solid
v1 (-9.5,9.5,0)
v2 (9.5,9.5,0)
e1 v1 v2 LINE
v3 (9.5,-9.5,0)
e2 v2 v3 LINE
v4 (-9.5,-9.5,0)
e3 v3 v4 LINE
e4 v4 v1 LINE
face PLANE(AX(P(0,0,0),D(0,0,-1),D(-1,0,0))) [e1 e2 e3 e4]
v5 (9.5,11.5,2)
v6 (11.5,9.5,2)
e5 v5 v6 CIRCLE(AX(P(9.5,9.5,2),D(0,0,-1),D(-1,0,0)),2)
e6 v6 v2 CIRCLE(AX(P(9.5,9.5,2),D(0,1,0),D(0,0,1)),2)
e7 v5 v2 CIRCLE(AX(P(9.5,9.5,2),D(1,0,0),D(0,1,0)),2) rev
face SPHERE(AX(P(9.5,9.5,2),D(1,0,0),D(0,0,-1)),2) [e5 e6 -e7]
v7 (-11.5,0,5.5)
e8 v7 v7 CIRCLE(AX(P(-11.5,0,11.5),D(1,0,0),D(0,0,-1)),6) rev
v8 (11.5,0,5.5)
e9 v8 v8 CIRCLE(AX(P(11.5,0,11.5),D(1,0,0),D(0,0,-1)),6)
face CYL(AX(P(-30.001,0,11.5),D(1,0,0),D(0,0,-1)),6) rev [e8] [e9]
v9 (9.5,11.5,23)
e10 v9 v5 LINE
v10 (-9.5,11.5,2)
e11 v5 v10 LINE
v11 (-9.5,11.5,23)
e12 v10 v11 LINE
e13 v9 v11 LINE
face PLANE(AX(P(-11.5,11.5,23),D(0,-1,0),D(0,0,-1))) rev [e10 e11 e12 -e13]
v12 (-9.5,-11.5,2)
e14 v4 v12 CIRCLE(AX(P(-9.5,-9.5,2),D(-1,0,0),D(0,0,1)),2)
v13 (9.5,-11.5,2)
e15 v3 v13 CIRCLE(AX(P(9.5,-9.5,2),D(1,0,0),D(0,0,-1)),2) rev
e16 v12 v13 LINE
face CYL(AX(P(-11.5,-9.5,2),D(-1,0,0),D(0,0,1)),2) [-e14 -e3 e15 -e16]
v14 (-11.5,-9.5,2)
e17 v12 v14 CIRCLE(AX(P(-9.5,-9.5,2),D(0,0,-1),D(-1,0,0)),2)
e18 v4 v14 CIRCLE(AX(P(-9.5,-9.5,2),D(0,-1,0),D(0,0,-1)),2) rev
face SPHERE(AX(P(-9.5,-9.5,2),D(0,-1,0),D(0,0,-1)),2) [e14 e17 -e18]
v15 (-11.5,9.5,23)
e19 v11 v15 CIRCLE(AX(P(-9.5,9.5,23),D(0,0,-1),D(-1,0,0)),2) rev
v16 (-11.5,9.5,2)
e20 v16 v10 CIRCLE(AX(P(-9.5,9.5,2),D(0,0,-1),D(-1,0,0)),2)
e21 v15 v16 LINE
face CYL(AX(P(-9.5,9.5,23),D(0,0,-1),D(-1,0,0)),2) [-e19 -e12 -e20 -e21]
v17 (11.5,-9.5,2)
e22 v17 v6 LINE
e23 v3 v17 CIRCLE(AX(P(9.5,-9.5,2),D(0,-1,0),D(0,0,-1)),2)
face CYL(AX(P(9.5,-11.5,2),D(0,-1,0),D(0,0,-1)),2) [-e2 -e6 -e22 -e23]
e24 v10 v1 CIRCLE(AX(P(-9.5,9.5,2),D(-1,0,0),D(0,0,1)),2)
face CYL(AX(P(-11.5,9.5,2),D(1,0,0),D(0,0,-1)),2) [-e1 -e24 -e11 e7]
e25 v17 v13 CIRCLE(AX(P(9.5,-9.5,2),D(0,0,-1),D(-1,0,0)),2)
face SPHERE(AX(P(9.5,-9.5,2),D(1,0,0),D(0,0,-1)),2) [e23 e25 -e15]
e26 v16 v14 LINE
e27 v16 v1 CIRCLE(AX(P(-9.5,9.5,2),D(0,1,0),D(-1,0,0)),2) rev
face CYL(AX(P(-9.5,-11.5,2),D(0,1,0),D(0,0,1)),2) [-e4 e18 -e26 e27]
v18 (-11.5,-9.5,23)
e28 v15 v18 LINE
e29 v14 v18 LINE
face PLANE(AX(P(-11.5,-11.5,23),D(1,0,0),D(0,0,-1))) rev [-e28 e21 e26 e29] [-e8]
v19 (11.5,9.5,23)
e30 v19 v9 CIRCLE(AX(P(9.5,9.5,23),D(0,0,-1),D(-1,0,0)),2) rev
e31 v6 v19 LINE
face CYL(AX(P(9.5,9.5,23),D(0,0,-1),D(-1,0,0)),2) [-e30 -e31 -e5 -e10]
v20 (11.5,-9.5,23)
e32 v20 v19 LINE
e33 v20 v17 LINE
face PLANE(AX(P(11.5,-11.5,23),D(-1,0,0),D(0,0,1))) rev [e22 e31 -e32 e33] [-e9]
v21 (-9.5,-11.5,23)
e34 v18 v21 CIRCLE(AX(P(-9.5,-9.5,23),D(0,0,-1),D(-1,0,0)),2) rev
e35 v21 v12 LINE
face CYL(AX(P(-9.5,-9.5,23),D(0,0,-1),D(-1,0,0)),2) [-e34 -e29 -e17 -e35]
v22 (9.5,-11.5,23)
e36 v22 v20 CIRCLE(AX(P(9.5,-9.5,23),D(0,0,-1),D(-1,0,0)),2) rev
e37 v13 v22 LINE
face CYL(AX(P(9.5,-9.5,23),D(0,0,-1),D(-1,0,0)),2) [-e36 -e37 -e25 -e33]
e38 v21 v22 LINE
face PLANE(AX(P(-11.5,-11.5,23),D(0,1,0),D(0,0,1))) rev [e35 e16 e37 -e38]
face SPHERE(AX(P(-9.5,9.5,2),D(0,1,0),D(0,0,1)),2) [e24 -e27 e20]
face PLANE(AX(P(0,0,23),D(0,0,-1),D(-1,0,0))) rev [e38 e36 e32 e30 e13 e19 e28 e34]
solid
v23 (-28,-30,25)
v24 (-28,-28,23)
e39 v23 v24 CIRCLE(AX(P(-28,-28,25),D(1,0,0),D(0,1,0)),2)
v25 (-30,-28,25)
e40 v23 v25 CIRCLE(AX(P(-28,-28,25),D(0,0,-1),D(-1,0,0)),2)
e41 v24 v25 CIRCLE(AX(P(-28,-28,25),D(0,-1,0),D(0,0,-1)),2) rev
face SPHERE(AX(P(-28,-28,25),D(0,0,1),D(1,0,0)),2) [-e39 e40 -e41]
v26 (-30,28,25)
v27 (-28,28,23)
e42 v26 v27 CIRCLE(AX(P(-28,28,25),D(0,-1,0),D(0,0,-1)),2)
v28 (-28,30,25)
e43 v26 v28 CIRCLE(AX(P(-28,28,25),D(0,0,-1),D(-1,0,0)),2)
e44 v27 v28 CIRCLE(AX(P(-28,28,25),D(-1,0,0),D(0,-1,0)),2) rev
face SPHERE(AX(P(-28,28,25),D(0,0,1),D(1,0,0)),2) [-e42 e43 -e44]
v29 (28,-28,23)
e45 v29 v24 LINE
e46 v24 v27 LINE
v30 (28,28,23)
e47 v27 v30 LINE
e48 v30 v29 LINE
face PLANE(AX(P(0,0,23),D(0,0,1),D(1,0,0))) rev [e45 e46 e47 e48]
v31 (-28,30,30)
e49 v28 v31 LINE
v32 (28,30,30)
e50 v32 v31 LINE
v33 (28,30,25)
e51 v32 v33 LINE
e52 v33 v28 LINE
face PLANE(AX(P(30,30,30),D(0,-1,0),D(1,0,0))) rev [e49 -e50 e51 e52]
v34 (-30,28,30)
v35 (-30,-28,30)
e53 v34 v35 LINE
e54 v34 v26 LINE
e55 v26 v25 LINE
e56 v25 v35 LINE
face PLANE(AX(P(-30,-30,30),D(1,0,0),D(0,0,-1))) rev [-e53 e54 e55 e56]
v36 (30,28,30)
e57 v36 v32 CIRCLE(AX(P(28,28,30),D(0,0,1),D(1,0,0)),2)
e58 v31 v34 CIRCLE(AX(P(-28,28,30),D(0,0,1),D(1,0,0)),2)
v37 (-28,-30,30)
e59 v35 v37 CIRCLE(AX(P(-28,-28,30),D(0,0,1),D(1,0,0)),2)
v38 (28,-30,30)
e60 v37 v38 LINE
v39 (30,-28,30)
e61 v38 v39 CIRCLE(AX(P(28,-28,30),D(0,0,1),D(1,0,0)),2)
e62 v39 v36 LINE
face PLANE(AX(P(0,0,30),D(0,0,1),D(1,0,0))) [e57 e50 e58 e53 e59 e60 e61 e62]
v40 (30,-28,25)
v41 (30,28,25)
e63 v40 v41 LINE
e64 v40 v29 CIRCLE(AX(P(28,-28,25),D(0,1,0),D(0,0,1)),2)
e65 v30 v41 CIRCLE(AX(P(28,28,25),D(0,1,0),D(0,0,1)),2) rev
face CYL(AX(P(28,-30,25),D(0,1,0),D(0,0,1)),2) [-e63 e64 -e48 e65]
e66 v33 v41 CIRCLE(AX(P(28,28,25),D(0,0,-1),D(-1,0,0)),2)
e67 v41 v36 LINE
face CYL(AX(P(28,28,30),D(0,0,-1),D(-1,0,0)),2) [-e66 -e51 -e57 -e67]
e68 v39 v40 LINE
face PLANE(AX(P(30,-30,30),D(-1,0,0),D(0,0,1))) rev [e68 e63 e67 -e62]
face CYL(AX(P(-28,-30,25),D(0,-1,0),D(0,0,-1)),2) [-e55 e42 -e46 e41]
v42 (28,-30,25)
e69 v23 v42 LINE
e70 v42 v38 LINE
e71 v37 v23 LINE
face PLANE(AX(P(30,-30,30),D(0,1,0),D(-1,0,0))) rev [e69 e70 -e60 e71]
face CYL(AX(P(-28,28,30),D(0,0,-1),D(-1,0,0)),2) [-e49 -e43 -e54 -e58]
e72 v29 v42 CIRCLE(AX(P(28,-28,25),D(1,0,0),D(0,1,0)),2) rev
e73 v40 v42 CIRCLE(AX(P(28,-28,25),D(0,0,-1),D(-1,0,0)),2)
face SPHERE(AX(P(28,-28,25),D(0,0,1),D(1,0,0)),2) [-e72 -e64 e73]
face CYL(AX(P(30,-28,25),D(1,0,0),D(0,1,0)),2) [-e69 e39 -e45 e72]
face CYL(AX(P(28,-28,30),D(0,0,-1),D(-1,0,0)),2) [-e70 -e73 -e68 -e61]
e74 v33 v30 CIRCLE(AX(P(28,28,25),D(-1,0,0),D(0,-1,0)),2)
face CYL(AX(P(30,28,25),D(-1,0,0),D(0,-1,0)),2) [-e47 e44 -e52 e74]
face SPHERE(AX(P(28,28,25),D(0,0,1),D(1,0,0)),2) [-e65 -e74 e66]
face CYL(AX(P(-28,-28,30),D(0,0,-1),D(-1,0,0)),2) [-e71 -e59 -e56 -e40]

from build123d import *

# Parameters (mm, degrees)
ESBO_O1_W                = 23
ESBO_O1_H                = 23
RESSALTO_EXTRUS_O1_DEPTH = 23
ESBO_O3_W                = 60
ESBO_O3_H                = 60
RESSALTO_EXTRUS_O2_DEPTH = 7
ESBO_O6_R                = 6
CORTE_EXTRUS_O1_DEPTH    = 23
FILETE1_R                = 2
FILETE2_R                = 2
FILETE3_R                = 2


with BuildPart() as part:
    # Esboço1 → Ressalto-extrusão1 (new body)
    with BuildSketch(Plane.XY):
        Rectangle(ESBO_O1_W, ESBO_O1_H)
    extrude(amount=RESSALTO_EXTRUS_O1_DEPTH)

    # Esboço6 → Corte-extrusão1 (cut)
    with BuildSketch(Plane(origin=(11.5, 0, 0), x_dir=(0, 0, -1), z_dir=(1, 0, 0))):
        with Locations((-11.5, 0)):
            Circle(ESBO_O6_R)
    extrude(amount=-CORTE_EXTRUS_O1_DEPTH, mode=Mode.SUBTRACT)

    # Filete3
    filete3_edges = [part.edges().sort_by_distance(p)[0] for p in [
        (0, -11.5, 0),
        (-11.5, 0, 0),
        (0, 11.5, 0),
        (11.5, 0, 0),
        (11.5, -11.5, 11.5),
        (-11.5, -11.5, 11.5),
        (-11.5, 11.5, 11.5),
        (11.5, 11.5, 11.5),
    ]]
    fillet(filete3_edges, radius=FILETE3_R)


with BuildPart() as body_2:
    # Esboço3 → Ressalto-extrusão2 (new body)
    with BuildSketch(Plane.XY.offset(23)):
        Rectangle(ESBO_O3_W, ESBO_O3_H)
    extrude(amount=RESSALTO_EXTRUS_O2_DEPTH)

    # Filete1
    filete1_edges = [body_2.edges().sort_by_distance(p)[0] for p in [
        (0, 30, 23),
        (30, 0, 23),
        (0, -30, 23),
        (-30, 0, 23),
    ]]
    fillet(filete1_edges, radius=FILETE1_R)

    # Filete2
    # the kernel refuses this fillet: 2 mm, written as the material it takes off along each edge
    with BuildSketch(Plane(origin=(-28, -28, 25), x_dir=(-1, 0, 0), z_dir=(0, -1, 0))) as filete2_piece_1_section:
        Polygon((0, 0), (FILETE2_R, 0), (FILETE2_R, FILETE2_R), (0, FILETE2_R), align=None)
    filete2_piece_1 = extrude(amount=FILETE2_R, mode=Mode.PRIVATE)
    filete2_piece_1 = filete2_piece_1 - Plane(origin=(-28, -28, 25), x_dir=(0.7071067811865475, 0, 0.7071067811865475), z_dir=(0, -1, 0)) * Sphere(FILETE2_R, mode=Mode.PRIVATE)
    add(filete2_piece_1, mode=Mode.SUBTRACT)
    with BuildSketch(Plane(origin=(-28, 28, 25), x_dir=(0, 1, 0), z_dir=(-1, 0, 0))) as filete2_piece_2_section:
        Polygon((0, 0), (FILETE2_R, 0), (FILETE2_R, FILETE2_R), (0, FILETE2_R), align=None)
    filete2_piece_2 = extrude(amount=FILETE2_R, mode=Mode.PRIVATE)
    filete2_piece_2 = filete2_piece_2 - Plane(origin=(-28, 28, 25), x_dir=(0, -0.7071067811865475, 0.7071067811865475), z_dir=(-1, 0, 0)) * Sphere(FILETE2_R, mode=Mode.PRIVATE)
    add(filete2_piece_2, mode=Mode.SUBTRACT)
    with BuildSketch(Plane(origin=(28, -28, 25), x_dir=(1, 0, 0), z_dir=(0, -1, 0))) as filete2_piece_3_section:
        Polygon((0, 0), (FILETE2_R, 0), (FILETE2_R, -FILETE2_R), (0, -FILETE2_R), align=None)
    filete2_piece_3 = extrude(amount=FILETE2_R, mode=Mode.PRIVATE)
    filete2_piece_3 = filete2_piece_3 - Plane(origin=(28, -28, 25), x_dir=(-0.7071067811865475, 0, 0.7071067811865475), z_dir=(0, -1, 0)) * Sphere(FILETE2_R, mode=Mode.PRIVATE)
    add(filete2_piece_3, mode=Mode.SUBTRACT)
    with BuildSketch(Plane(origin=(28, 28, 25), x_dir=(0, 1, 0), z_dir=(1, 0, 0))) as filete2_piece_4_section:
        Polygon((0, 0), (FILETE2_R, 0), (FILETE2_R, -FILETE2_R), (0, -FILETE2_R), align=None)
    filete2_piece_4 = extrude(amount=FILETE2_R, mode=Mode.PRIVATE)
    filete2_piece_4 = filete2_piece_4 - Plane(origin=(28, 28, 25), x_dir=(0, -0.7071067811865475, 0.7071067811865475), z_dir=(1, 0, 0)) * Sphere(FILETE2_R, mode=Mode.PRIVATE)
    add(filete2_piece_4, mode=Mode.SUBTRACT)
    with BuildSketch(Plane(origin=(-30, 30, 25), x_dir=(0, -1, 0), z_dir=(0, 0, 1)), Plane(origin=(-30, -30, 25), x_dir=(1, 0, 0), z_dir=(0, 0, 1))) as filete2_piece_5:
        with BuildLine():
            CenterArc((FILETE2_R, FILETE2_R), FILETE2_R, 180, 90)
            Line((0, FILETE2_R), (0, 0))
            Line((0, 0), (FILETE2_R, 0))
        make_face()
    extrude(amount=10, mode=Mode.SUBTRACT)
    with BuildSketch(Plane(origin=(30, 30, 25), x_dir=(0, -1, 0), z_dir=(0, 0, 1)), Plane(origin=(30, -30, 25), x_dir=(-1, 0, 0), z_dir=(0, 0, 1))) as filete2_piece_6:
        with BuildLine():
            CenterArc((FILETE2_R, -FILETE2_R), FILETE2_R, 90, 90)
            Line((0, -FILETE2_R), (0, 0))
            Line((0, 0), (FILETE2_R, 0))
        make_face()
    extrude(amount=10, mode=Mode.SUBTRACT)


solid = Compound([part.part, body_2.part])
